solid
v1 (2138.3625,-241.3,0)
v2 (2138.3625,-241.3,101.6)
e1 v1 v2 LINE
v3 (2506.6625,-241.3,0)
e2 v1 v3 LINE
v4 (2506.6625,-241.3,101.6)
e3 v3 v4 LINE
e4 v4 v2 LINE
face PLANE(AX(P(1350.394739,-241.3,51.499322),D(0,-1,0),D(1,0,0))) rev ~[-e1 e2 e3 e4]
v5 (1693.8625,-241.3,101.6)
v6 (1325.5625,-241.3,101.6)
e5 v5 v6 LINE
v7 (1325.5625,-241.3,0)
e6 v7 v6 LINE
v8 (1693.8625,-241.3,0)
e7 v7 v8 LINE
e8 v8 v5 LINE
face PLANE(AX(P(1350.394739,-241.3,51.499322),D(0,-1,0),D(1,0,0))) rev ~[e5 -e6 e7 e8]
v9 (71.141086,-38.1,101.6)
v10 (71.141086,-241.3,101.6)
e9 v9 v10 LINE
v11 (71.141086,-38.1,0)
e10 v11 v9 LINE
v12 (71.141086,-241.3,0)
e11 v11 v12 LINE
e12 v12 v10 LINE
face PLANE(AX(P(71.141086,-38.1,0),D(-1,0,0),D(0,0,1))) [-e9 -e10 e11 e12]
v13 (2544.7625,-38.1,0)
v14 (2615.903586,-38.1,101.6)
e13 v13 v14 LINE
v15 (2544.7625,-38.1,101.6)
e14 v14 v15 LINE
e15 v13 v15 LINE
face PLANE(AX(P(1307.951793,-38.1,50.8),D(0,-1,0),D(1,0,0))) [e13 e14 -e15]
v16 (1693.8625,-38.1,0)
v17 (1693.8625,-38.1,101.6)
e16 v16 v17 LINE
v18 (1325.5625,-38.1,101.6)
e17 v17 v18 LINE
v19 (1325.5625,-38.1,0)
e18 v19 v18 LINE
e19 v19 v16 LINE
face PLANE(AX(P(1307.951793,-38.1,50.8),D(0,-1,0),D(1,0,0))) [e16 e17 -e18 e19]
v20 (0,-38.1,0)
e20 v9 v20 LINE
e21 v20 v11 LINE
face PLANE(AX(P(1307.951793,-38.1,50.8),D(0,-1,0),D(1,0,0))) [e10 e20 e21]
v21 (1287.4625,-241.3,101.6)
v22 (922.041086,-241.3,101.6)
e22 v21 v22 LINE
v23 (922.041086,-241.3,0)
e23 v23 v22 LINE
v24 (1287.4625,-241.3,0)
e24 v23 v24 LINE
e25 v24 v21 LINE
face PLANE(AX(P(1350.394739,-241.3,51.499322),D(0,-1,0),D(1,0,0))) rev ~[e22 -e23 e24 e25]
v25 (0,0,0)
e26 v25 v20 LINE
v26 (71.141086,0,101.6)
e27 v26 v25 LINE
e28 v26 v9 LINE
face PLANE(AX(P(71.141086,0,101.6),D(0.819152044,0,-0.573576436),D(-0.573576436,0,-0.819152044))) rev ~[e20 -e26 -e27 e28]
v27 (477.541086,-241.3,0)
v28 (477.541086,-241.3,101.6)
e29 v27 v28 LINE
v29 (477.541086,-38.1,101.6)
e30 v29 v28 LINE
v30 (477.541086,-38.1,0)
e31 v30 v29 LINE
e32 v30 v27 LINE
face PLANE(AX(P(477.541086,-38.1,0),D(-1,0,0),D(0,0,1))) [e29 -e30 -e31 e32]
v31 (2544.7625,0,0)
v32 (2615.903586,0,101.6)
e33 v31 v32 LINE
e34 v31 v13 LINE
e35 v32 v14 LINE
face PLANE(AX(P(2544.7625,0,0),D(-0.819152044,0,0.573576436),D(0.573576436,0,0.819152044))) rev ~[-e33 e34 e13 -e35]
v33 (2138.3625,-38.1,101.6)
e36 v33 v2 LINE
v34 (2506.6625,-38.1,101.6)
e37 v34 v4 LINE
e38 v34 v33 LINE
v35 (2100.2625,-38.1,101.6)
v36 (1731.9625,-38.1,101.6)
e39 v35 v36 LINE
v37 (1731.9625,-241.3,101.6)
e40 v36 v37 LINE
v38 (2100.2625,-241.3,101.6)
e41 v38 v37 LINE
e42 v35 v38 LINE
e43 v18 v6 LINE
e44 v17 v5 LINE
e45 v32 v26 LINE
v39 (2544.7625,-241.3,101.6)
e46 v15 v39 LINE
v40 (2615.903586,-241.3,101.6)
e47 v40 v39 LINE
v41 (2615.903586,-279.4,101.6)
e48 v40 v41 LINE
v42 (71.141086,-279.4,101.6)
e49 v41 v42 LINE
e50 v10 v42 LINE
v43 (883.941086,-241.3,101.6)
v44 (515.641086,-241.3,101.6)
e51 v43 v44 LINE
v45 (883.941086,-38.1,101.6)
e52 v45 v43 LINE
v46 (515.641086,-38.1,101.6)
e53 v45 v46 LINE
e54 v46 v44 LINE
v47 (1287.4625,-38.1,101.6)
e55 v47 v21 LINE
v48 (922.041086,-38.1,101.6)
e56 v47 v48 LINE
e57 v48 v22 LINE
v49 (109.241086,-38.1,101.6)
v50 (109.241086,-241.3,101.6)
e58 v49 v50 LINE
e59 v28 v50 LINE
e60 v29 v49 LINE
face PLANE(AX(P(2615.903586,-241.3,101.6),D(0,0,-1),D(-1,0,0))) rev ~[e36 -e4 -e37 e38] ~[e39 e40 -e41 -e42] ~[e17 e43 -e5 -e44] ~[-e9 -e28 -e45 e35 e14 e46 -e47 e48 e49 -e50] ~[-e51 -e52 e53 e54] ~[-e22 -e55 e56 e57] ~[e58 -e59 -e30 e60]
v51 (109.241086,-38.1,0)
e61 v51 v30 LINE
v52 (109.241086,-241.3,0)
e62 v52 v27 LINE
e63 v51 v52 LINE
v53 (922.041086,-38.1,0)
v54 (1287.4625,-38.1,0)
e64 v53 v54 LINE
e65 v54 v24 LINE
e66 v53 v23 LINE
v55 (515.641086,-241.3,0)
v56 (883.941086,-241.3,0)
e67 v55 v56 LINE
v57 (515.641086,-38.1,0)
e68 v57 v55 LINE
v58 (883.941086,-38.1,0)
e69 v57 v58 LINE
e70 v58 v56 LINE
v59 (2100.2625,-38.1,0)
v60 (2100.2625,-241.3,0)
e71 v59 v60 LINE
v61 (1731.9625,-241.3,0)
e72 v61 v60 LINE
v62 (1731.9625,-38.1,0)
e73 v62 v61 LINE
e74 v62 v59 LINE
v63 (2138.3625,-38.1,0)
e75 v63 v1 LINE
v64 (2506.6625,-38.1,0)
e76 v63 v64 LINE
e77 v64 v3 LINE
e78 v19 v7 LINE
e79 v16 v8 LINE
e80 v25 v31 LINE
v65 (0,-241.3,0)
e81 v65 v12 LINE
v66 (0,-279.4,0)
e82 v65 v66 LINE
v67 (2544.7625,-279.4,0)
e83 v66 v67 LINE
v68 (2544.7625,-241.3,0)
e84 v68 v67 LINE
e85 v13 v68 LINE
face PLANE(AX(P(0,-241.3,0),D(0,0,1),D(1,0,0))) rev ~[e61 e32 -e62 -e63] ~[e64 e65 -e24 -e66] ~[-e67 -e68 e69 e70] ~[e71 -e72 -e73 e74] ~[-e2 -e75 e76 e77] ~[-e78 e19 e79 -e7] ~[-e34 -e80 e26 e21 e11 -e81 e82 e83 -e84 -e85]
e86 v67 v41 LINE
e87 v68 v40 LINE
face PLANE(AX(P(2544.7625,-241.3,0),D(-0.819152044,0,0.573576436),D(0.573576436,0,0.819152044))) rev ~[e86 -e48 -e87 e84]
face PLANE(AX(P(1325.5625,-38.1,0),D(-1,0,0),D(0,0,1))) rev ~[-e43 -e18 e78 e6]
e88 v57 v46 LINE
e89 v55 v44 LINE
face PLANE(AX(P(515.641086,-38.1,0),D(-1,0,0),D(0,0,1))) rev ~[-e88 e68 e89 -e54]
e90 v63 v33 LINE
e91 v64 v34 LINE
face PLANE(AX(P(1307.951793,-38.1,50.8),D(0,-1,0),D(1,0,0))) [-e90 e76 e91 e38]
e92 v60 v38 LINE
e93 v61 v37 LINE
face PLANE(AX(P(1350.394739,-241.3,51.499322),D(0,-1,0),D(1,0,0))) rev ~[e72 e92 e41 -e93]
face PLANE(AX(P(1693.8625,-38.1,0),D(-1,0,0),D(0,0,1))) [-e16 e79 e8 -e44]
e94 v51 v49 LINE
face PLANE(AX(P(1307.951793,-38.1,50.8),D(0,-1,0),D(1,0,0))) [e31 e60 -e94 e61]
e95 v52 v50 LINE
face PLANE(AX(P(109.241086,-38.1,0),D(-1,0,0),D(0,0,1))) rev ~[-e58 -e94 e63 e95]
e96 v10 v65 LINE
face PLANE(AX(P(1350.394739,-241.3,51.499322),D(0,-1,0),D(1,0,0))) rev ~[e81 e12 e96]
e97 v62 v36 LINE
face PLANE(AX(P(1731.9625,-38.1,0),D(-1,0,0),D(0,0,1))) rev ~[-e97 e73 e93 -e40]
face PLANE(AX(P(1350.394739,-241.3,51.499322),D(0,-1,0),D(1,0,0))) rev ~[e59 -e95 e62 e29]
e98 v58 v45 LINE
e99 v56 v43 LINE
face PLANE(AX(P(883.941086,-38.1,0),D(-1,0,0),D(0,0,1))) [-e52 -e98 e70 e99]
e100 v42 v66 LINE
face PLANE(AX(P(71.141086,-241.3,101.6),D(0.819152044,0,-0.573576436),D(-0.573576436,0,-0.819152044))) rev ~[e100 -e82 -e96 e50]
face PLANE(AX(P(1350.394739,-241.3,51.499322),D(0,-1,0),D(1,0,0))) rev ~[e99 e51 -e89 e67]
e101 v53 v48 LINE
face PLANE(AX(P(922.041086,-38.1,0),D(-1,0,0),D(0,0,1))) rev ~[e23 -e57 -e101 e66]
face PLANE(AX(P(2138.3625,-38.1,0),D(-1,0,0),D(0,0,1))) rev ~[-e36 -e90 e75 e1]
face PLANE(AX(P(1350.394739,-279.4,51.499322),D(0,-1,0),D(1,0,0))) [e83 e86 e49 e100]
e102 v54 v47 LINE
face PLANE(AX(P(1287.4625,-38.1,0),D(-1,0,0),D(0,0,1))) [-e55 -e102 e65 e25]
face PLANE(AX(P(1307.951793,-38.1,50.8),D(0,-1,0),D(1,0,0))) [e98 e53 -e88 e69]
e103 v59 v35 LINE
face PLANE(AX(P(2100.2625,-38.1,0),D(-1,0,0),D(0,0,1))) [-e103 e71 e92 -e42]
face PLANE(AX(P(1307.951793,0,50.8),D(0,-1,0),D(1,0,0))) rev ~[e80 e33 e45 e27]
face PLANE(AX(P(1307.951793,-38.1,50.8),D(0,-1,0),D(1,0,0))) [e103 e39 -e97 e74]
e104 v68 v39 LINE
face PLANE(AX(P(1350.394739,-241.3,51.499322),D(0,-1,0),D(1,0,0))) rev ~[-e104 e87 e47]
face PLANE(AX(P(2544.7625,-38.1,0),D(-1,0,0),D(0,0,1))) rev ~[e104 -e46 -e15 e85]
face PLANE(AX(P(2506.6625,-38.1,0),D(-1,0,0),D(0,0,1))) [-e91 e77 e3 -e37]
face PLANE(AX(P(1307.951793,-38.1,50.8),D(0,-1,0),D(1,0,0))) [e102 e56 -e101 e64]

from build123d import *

# Parameters (mm, degrees)
F1_DEPTH = 38.1
F2_W     = 38.1
F2_H     = 101.6
F3_DEPTH = 203.2
F4_W     = 38.1
F4_H     = 101.6
F5_DEPTH = 38.1


# Not quite as in the source:
# - a feature names something its author has since deleted; it is built from what else it names


with BuildPart() as f1:
    # F0 (on Front) → F1 (new body)
    with BuildSketch(Plane.XZ):
        Polygon((71.1410858821, 101.6), (0, 0), (2544.7625, 0), (2615.9035858821, 101.6), align=None)
    extrude(amount=F1_DEPTH)

    # F2 (on face) → F3 (join)
    with BuildSketch(Plane.XZ.offset(38.1)):
        with Locations((90.1910858821, 50.8)):
            Rectangle(F2_W, F2_H)
        with Locations((496.5910858821, 50.8)):
            Rectangle(F2_W, F2_H)
        with Locations((902.9910858821, 50.8)):
            Rectangle(F2_W, F2_H)
        with Locations((1306.5125, 50.8)):
            Rectangle(F2_W, F2_H)
        with Locations((1712.9125, 50.8)):
            Rectangle(F2_W, F2_H)
        with Locations((2119.3125, 50.8)):
            Rectangle(F2_W, F2_H)
        with Locations((2525.7125, 50.8)):
            Rectangle(F2_W, F2_H)
    extrude(amount=F3_DEPTH)

    # F4 (on face) → F5 (join)
    with BuildSketch(Plane.XZ.offset(241.3)):
        Polygon((2615.9035858821, 101.6), (109.2410858821, 101.6), (109.2410858821, 0), (2544.7625, 0), align=None)
        with Locations((90.1910858821, 50.8)):
            Rectangle(F4_W, F4_H)
        Polygon((71.1410858821, 101.6), (0, 0), (71.1410858821, 0), align=None)
    extrude(amount=F5_DEPTH)


solid = f1.part
